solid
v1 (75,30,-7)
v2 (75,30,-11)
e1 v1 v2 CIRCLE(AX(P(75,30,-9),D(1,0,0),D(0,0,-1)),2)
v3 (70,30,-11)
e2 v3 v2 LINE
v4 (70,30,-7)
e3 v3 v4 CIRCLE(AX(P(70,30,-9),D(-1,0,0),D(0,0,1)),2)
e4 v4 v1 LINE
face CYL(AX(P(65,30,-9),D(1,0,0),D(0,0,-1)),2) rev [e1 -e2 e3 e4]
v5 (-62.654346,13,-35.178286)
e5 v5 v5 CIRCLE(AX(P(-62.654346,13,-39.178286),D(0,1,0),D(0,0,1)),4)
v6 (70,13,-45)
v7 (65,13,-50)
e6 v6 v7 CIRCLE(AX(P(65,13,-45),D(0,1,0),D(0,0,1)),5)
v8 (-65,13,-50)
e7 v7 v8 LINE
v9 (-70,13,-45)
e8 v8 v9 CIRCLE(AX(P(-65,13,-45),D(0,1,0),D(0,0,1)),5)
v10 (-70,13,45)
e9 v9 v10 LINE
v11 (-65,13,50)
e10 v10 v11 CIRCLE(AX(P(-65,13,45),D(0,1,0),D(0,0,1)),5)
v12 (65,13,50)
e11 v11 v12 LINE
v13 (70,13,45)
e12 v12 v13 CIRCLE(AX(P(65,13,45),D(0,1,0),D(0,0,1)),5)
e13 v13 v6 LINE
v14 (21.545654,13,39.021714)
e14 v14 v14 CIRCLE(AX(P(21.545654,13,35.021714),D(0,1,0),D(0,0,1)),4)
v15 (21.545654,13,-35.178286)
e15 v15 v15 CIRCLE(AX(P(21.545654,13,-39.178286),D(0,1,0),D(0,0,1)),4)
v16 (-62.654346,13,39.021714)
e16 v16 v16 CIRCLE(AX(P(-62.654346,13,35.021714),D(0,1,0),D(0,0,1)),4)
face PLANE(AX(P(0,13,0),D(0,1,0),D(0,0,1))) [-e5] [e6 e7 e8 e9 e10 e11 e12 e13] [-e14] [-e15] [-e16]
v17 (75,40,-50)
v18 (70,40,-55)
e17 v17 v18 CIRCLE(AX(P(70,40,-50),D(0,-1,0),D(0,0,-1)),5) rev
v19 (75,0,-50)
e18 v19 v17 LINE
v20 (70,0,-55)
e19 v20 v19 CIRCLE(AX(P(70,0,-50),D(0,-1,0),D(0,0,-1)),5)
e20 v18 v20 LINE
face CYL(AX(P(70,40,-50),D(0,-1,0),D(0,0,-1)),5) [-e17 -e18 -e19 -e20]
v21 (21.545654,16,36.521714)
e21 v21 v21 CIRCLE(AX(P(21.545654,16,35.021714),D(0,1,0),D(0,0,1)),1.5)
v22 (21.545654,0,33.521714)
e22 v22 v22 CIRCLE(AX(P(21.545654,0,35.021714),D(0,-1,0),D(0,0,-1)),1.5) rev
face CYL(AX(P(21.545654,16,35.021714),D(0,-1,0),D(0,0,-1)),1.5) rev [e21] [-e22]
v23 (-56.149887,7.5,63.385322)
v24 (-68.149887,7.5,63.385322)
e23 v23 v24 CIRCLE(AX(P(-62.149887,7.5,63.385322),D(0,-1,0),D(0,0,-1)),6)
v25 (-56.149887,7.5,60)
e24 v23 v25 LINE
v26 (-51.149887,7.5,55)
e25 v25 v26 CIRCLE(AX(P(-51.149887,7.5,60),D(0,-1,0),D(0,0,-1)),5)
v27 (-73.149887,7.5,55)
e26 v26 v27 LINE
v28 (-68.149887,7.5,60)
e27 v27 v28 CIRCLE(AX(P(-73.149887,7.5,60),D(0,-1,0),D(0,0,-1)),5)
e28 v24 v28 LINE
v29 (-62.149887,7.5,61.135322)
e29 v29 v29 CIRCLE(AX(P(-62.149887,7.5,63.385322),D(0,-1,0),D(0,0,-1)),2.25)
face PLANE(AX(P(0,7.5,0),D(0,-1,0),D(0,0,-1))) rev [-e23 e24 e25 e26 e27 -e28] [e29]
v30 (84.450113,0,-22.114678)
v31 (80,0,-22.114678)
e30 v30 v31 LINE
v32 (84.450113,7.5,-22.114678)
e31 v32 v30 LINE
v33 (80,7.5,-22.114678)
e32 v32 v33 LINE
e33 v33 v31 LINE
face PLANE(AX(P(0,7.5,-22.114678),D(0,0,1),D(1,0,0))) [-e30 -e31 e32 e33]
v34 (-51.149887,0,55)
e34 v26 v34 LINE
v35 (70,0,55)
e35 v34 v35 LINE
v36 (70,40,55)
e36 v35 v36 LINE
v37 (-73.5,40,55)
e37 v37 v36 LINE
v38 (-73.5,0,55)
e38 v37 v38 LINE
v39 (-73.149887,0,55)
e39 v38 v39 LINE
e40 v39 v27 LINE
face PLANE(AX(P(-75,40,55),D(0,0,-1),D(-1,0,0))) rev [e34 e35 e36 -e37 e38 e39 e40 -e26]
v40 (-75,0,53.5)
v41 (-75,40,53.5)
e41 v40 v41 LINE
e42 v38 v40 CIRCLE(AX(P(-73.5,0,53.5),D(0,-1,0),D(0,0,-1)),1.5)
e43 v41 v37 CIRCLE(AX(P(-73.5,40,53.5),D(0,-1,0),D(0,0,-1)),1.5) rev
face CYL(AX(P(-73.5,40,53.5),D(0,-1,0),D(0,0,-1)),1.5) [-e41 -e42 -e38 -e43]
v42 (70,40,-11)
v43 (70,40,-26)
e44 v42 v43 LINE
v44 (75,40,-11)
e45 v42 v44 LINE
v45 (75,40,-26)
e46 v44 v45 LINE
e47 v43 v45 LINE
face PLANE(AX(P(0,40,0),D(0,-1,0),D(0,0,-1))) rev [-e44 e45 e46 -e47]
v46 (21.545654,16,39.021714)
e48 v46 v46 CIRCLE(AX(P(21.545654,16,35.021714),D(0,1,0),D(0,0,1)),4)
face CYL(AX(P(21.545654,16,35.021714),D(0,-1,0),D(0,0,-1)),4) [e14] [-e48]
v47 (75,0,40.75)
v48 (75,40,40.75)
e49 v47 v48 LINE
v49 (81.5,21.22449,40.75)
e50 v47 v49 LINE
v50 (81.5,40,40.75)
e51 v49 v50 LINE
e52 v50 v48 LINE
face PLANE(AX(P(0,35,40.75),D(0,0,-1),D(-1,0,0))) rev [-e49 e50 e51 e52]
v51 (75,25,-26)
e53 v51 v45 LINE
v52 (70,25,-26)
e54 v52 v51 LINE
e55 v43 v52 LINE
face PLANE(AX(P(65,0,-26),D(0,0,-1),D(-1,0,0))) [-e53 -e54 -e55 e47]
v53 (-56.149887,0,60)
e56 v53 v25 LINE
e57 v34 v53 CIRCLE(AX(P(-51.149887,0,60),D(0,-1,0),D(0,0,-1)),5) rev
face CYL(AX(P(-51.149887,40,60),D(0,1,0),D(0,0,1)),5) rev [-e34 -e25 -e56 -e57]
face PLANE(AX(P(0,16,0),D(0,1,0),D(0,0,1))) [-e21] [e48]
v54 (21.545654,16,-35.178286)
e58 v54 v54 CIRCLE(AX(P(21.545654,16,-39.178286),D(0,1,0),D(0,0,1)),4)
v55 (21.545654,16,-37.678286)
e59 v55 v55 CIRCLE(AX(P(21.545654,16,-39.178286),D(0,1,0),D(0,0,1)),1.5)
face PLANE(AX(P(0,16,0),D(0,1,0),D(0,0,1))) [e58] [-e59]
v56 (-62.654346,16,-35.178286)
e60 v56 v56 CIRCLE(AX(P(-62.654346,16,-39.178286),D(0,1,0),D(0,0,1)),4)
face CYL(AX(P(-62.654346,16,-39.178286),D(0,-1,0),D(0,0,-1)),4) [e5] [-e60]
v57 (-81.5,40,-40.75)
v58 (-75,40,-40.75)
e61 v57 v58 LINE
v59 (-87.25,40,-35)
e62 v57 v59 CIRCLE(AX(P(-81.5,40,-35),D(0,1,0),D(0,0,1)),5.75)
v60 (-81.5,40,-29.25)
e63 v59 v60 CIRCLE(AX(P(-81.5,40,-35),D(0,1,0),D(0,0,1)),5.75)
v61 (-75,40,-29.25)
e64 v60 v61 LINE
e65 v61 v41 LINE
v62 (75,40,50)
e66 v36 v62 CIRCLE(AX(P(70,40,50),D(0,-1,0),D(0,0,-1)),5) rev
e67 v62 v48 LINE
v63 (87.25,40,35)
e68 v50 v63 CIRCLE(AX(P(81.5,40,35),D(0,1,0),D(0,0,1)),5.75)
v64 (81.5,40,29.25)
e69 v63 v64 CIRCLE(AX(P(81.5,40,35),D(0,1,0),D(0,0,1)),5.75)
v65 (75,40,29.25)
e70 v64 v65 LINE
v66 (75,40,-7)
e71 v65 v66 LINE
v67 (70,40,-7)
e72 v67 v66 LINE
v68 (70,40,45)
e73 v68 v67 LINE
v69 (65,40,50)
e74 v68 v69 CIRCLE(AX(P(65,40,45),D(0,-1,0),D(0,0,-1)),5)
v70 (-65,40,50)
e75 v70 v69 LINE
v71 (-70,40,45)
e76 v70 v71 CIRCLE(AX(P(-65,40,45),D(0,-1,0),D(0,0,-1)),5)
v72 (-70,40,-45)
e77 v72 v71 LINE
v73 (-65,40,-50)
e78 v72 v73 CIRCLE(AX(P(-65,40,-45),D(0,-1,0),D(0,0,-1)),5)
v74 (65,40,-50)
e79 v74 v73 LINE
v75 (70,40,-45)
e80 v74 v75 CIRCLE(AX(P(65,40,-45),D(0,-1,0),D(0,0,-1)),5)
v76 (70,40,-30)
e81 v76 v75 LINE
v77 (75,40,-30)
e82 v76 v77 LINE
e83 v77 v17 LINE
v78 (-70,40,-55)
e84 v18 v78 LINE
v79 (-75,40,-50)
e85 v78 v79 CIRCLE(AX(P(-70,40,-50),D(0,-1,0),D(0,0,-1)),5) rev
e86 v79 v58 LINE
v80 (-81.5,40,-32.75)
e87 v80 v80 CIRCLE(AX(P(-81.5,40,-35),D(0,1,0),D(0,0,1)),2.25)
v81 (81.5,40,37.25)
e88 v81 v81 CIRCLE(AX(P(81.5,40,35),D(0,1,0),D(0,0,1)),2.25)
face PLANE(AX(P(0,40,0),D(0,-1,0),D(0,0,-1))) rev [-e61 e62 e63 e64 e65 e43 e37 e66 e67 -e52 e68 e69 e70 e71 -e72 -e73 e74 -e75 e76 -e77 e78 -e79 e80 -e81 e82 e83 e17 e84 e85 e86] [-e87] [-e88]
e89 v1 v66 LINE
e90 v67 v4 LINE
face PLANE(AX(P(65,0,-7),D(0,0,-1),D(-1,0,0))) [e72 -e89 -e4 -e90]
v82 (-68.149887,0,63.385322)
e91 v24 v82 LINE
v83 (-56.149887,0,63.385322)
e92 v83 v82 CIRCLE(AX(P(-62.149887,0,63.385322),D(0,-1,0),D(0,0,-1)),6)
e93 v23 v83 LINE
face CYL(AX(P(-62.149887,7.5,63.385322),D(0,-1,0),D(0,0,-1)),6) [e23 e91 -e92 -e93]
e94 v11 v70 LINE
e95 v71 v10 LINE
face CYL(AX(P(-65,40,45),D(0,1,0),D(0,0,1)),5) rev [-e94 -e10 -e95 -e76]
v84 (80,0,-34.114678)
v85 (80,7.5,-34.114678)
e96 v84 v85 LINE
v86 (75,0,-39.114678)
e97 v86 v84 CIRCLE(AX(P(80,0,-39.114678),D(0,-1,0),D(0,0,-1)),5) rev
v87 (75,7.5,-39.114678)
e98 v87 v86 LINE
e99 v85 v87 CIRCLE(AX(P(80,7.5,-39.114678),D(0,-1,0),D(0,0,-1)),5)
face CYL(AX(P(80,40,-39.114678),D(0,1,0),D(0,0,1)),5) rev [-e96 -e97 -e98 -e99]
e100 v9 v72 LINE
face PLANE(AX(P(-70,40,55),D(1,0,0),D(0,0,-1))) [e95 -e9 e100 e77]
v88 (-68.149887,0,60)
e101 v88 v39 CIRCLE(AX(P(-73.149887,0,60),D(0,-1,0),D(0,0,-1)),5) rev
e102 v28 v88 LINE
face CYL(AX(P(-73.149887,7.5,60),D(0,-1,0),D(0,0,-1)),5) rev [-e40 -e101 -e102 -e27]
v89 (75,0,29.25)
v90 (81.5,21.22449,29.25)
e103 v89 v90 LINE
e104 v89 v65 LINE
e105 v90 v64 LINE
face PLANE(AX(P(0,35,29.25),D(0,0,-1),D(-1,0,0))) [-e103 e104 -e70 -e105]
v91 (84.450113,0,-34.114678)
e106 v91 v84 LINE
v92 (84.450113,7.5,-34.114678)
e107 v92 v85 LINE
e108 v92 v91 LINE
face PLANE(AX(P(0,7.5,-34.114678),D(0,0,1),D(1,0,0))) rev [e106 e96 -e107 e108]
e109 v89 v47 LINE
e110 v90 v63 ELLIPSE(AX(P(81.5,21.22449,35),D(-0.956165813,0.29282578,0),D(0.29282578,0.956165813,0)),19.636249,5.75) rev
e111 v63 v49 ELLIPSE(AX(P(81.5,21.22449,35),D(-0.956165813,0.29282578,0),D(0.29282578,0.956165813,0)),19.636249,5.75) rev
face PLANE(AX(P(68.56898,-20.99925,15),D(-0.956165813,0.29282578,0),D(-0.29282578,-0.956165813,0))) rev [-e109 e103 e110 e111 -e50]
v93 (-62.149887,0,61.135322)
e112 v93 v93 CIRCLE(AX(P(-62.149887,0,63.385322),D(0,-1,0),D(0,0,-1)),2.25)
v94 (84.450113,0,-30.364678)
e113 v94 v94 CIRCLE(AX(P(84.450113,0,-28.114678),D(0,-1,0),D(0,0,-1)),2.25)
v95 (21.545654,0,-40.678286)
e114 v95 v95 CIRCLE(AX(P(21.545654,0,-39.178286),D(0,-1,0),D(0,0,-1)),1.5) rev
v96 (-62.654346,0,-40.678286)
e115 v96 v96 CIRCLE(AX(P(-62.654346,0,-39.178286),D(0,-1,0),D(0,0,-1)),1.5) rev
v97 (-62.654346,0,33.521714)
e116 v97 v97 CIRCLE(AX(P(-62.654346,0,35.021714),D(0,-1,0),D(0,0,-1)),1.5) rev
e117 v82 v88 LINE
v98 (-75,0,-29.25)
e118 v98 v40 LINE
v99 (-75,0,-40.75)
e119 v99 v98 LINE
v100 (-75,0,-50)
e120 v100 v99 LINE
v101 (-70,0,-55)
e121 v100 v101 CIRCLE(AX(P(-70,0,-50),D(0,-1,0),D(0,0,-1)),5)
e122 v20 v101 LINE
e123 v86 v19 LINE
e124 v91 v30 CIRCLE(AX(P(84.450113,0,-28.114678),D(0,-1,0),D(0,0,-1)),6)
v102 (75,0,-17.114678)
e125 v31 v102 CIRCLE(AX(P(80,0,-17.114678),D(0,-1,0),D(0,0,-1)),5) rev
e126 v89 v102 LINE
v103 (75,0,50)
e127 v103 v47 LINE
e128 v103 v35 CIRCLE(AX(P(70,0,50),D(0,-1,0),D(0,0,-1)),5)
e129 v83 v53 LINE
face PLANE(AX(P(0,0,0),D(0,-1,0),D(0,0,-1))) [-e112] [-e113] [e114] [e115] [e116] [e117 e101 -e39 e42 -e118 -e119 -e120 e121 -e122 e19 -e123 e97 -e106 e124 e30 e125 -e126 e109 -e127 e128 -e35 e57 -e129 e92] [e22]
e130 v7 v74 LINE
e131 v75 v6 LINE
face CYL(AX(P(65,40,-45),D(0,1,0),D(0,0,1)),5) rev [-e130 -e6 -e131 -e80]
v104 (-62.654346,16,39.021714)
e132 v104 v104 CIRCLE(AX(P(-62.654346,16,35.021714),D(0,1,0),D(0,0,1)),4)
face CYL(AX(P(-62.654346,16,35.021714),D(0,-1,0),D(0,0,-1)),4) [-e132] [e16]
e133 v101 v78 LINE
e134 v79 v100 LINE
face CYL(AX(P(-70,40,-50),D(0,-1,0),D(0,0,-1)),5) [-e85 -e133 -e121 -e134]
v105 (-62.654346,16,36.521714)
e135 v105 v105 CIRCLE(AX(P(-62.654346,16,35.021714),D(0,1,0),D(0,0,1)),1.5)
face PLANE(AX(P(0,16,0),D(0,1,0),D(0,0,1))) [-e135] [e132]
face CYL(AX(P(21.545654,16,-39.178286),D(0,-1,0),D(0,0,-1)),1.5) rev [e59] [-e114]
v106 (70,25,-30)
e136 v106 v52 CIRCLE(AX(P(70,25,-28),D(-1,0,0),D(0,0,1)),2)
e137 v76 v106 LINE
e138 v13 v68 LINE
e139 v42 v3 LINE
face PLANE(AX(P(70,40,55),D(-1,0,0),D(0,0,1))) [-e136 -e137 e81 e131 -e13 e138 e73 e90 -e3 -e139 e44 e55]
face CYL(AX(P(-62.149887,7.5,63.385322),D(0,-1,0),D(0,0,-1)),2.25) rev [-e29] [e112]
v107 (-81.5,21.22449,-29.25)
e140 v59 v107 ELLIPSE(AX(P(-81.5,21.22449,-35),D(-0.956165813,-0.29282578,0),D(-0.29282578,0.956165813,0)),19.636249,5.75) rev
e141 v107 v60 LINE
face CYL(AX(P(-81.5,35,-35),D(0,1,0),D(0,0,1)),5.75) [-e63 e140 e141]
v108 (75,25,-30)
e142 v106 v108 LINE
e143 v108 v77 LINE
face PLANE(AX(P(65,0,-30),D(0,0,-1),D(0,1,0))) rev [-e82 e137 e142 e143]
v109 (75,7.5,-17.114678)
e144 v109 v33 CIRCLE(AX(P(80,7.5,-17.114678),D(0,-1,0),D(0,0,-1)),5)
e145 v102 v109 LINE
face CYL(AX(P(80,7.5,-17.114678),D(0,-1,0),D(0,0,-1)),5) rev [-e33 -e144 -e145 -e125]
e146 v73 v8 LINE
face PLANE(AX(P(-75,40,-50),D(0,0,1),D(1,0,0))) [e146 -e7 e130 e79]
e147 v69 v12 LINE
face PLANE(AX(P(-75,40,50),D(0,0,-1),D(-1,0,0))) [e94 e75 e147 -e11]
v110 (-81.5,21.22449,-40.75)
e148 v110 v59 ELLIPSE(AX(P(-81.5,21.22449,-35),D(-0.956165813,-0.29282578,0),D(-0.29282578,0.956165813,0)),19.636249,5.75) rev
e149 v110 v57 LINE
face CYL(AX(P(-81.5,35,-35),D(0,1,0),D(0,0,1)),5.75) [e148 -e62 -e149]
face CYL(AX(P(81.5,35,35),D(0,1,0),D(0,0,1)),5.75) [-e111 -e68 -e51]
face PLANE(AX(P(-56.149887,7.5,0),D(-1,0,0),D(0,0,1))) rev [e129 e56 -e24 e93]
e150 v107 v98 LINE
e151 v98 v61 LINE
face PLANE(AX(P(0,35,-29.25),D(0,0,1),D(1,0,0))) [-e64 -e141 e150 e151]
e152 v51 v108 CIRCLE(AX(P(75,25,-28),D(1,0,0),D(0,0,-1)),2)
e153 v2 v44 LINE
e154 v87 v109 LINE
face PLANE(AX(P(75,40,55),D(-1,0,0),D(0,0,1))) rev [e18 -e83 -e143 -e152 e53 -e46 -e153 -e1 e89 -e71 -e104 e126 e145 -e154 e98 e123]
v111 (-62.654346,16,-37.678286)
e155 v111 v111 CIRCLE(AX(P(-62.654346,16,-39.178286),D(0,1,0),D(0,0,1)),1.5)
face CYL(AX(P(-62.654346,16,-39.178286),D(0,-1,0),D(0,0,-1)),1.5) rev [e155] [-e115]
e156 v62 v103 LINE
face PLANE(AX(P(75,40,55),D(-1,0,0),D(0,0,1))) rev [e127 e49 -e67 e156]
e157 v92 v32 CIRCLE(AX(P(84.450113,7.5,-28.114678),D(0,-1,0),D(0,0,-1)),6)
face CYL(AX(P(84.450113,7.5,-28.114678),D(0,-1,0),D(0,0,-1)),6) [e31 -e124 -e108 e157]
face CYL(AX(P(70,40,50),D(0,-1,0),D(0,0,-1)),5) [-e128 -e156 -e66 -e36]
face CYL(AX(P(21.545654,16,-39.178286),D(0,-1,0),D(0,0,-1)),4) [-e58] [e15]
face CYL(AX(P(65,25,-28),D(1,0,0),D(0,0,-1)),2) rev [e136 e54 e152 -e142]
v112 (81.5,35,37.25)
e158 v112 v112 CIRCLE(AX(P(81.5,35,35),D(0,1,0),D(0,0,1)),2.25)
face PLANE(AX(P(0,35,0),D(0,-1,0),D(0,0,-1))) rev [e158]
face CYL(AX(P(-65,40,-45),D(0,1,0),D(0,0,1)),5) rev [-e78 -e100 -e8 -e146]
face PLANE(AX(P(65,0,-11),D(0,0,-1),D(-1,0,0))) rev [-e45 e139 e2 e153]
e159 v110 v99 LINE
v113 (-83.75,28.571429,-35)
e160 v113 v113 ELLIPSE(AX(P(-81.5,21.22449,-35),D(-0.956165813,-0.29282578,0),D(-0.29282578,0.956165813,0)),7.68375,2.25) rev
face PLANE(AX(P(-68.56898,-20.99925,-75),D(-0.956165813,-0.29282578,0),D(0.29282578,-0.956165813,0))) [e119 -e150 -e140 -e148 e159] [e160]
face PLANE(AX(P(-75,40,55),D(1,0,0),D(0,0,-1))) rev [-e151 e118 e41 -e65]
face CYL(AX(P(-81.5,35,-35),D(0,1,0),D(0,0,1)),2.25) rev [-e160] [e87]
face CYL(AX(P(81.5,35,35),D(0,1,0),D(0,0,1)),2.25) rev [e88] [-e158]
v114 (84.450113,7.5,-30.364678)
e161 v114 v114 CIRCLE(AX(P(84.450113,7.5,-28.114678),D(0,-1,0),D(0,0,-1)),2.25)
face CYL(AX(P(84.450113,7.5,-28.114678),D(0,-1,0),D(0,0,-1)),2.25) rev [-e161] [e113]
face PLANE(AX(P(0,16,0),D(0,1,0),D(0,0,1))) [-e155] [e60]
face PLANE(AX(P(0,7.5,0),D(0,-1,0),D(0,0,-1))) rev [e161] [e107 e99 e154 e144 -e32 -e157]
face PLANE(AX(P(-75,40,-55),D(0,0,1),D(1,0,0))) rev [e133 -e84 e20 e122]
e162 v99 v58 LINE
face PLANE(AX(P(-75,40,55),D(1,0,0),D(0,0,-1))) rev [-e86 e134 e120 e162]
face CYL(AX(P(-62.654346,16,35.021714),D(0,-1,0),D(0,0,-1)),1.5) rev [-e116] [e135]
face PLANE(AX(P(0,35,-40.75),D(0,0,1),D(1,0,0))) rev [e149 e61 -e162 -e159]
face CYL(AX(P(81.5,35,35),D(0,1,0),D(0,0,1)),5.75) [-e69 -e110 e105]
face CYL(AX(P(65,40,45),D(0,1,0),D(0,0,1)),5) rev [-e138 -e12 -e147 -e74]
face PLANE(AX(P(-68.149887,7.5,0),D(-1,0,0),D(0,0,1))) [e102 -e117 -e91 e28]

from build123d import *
from build123d.topology import SkipClean

# Parameters (mm, degrees)
SKETCH1_W           = 150
SKETCH1_H           = 110
BOSS_EXTRUDE1_DEPTH = 40
SHELL1_T            = -5
SKETCH2_R           = 6
SKETCH2_R_2         = 2.25
BOSS_EXTRUDE2_DEPTH = 7.5
SKETCH3_W           = 100
SKETCH3_H           = 100
BOSS_EXTRUDE3_DEPTH = 8
SKETCH4_W           = 99
SKETCH4_H           = 99
CUT_EXTRUDE1_DEPTH  = 8
SKETCH6_R           = 4
SKETCH6_R_2         = 1.5
BOSS_EXTRUDE4_DEPTH = 3
SKETCH7_R           = 1.5
CUT_EXTRUDE2_DEPTH  = 117.496977326
FILLET1_R           = 5
FILLET2_R           = 1.5
SKETCH8_R           = 2.25
BOSS_EXTRUDE5_DEPTH = 5
BOSS_EXTRUDE6_START = 8
BOSS_EXTRUDE6_DEPTH = 8
SKETCH10_R          = 2
CUT_EXTRUDE3_DEPTH  = 10
BOSS_EXTRUDE7_START = 8
SKETCH11_W          = 99
SKETCH11_H          = 99
SKETCH11_R          = 1.5
BOSS_EXTRUDE7_DEPTH = 8
SKETCH12_R          = 2.25
BOSS_EXTRUDE8_DEPTH = 35
CUT_EXTRUDE4_DEPTH  = 40
CUT_EXTRUDE5_DEPTH  = 130


with BuildPart() as part:
    # Sketch1 → Boss-Extrude1 (new body)
    with BuildSketch(Plane(origin=(0, 0, 0), x_dir=(1, 0, 0), z_dir=(0, 1, 0))):
        Rectangle(SKETCH1_W, SKETCH1_H)
    extrude(amount=BOSS_EXTRUDE1_DEPTH)

    # Shell1
    shell1_openings = [part.faces().sort_by_distance(p)[0] for p in [
        (0, 40, 0),
    ]]
    offset(amount=SHELL1_T, openings=shell1_openings, kind=Kind.INTERSECTION)

    # Sketch2 → Boss-Extrude2 (add)
    # profile 1 of 4: a face of its own
    with BuildSketch(Plane.XZ):
        with Locations((84.450112608, -28.114678388)):
            Circle(SKETCH2_R)
        with Locations(Location((84.450112608, -28.114678388, 0), (0, 0, 270))):
            Circle(SKETCH2_R_2, mode=Mode.SUBTRACT)
    # profile 2 of 4: a face of its own
    with BuildSketch(Plane.XZ):
        with BuildLine():
            ThreePointArc((84.450112608, -34.114678388), (78.450112608, -28.114678388), (84.450112608, -22.114678388))
            Line((84.450112608, -22.114678388), (75, -22.114678388))
            Line((75, -22.114678388), (75, -34.114678388))
            Line((75, -34.114678388), (84.450112608, -34.114678388))
        make_face()
    # profile 3 of 4: a face of its own
    with BuildSketch(Plane.XZ):
        with Locations((-62.149887392, 63.385321612)):
            Circle(SKETCH2_R)
        with Locations(Location((-62.149887392, 63.385321612, 0), (0, 0, 270))):
            Circle(SKETCH2_R_2, mode=Mode.SUBTRACT)
    # profile 4 of 4: a face of its own
    with BuildSketch(Plane.XZ):
        with BuildLine():
            Line((-68.149887392, 55), (-56.149887392, 55))
            Line((-56.149887392, 55), (-56.149887392, 63.385321612))
            ThreePointArc((-56.149887392, 63.385321612), (-62.149887392, 57.385321612), (-68.149887392, 63.385321612))
            Line((-68.149887392, 63.385321612), (-68.149887392, 55))
        make_face()
    extrude(amount=-BOSS_EXTRUDE2_DEPTH)

    # Sketch3 → Boss-Extrude3 (add)
    with BuildSketch(Plane(origin=(0, 5, 0), x_dir=(1, 0, 0), z_dir=(0, 1, 0))):
        with Locations((-20, 0)):
            Rectangle(SKETCH3_W, SKETCH3_H)
    extrude(amount=BOSS_EXTRUDE3_DEPTH)

    # Sketch4 → Cut-Extrude1 (cut)
    with BuildSketch(Plane.XZ):
        with Locations((-20, 0)):
            Rectangle(SKETCH4_W, SKETCH4_H)
    extrude(amount=-CUT_EXTRUDE1_DEPTH, mode=Mode.SUBTRACT)

    # Sketch6 → Boss-Extrude4 (add)
    # profile 1 of 4: a face of its own
    with BuildSketch(Plane(origin=(0, 13, 0), x_dir=(1, 0, 0), z_dir=(0, 1, 0))):
        with Locations(Location((21.54565415, 39.178286409, 0), (0, 0, 270))):
            Circle(SKETCH6_R)
        with Locations(Location((21.54565415, 39.178286409, 0), (0, 0, 270))):
            Circle(SKETCH6_R_2, mode=Mode.SUBTRACT)
    # profile 2 of 4: a face of its own
    with BuildSketch(Plane(origin=(0, 13, 0), x_dir=(1, 0, 0), z_dir=(0, 1, 0))):
        with Locations(Location((21.54565415, -35.021713591, 0), (0, 0, 270))):
            Circle(SKETCH6_R)
        with Locations(Location((21.54565415, -35.021713591, 0), (0, 0, 270))):
            Circle(SKETCH6_R_2, mode=Mode.SUBTRACT)
    # profile 3 of 4: a face of its own
    with BuildSketch(Plane(origin=(0, 13, 0), x_dir=(1, 0, 0), z_dir=(0, 1, 0))):
        with Locations(Location((-62.65434585, -35.021713591, 0), (0, 0, 270))):
            Circle(SKETCH6_R)
        with Locations(Location((-62.65434585, -35.021713591, 0), (0, 0, 270))):
            Circle(SKETCH6_R_2, mode=Mode.SUBTRACT)
    # profile 4 of 4: a face of its own
    with BuildSketch(Plane(origin=(0, 13, 0), x_dir=(1, 0, 0), z_dir=(0, 1, 0))):
        with Locations(Location((-62.65434585, 39.178286409, 0), (0, 0, 270))):
            Circle(SKETCH6_R)
        with Locations(Location((-62.65434585, 39.178286409, 0), (0, 0, 270))):
            Circle(SKETCH6_R_2, mode=Mode.SUBTRACT)
    extrude(amount=BOSS_EXTRUDE4_DEPTH)

    # Sketch7 → Cut-Extrude2 (cut, through all)
    with SkipClean():  # the faces are left unmerged after this step: merging them gives an invalid solid
        with BuildSketch(Plane(origin=(0, 16, 0), x_dir=(1, 0, 0), z_dir=(0, 1, 0))):
            with Locations(Location((-62.65434585, -35.021713591, 0), (0, 0, 90))):
                Circle(SKETCH7_R)
            with Locations(Location((-62.65434585, 39.178286409, 0), (0, 0, 90))):
                Circle(SKETCH7_R)
            with Locations(Location((21.54565415, -35.021713591, 0), (0, 0, 90))):
                Circle(SKETCH7_R)
            with Locations(Location((21.54565415, 39.178286409, 0), (0, 0, 90))):
                Circle(SKETCH7_R)
        extrude(amount=-CUT_EXTRUDE2_DEPTH, mode=Mode.SUBTRACT)
    add(part.part.scale(1), mode=Mode.REPLACE)  # the faces are merged on a copy

    # Fillet1
    fillet1_edges = [part.edges().sort_by_distance(p)[0] for p in [
        (70, 22.5, 50),
        (70, 22.5, -50),
        (-70, 26.5, -50),
        (-70, 26.5, 50),
        (75, 3.75, -34.114678388),
        (75, 3.75, -22.114678388),
        (-56.149887392, 3.75, 55),
        (-68.149887392, 3.75, 55),
        (75, 20, 55),
        (-75, 20, -55),
        (75, 20, -55),
    ]]
    fillet(fillet1_edges, radius=FILLET1_R)

    # Fillet2
    fillet2_edges = [part.edges().sort_by_distance(p)[0] for p in [
        (-75, 20, 55),
    ]]
    fillet(fillet2_edges, radius=FILLET2_R)

    # Sketch8 → Boss-Extrude5 (add)
    # profile 1 of 2: a face of its own
    with BuildSketch(Plane(origin=(0, 40, 0), x_dir=(1, 0, 0), z_dir=(0, 1, 0))):
        with BuildLine():
            Line((-75, 40.75), (-81.5, 40.75))
            ThreePointArc((-81.5, 40.75), (-87.25, 35), (-81.5, 29.25))
            Line((-81.5, 29.25), (-75, 29.25))
            Line((-75, 29.25), (-75, 40.75))
        make_face()
        with Locations(Location((-81.5, 35, 0), (0, 0, 270))):
            Circle(SKETCH8_R, mode=Mode.SUBTRACT)
    # profile 2 of 2: a face of its own
    with BuildSketch(Plane(origin=(0, 40, 0), x_dir=(1, 0, 0), z_dir=(0, 1, 0))):
        with BuildLine():
            Line((75, -40.75), (81.5, -40.75))
            ThreePointArc((81.5, -40.75), (87.25, -35), (81.5, -29.25))
            Line((81.5, -29.25), (75, -29.25))
            Line((75, -29.25), (75, -40.75))
        make_face()
        with Locations(Location((81.5, -35, 0), (0, 0, 270))):
            Circle(SKETCH8_R, mode=Mode.SUBTRACT)
    extrude(amount=-BOSS_EXTRUDE5_DEPTH)

    # Sketch9 → Boss-Extrude6 (add)
    with BuildSketch(Plane(origin=(0, 5, 0), x_dir=(1, 0, 0), z_dir=(0, 1, 0)).offset(BOSS_EXTRUDE6_START)):
        with BuildLine():
            Line((30, -50), (65, -50))
            ThreePointArc((65, -50), (68.535533906, -48.535533906), (70, -45))
            Line((70, -45), (70, 45))
            ThreePointArc((70, 45), (68.535533906, 48.535533906), (65, 50))
            Line((65, 50), (30, 50))
            Line((30, 50), (30, -50))
        make_face()
    extrude(amount=-BOSS_EXTRUDE6_DEPTH)

    # Sketch10 → Cut-Extrude3 (cut)
    with BuildSketch(Plane(origin=(75, 0, 0), x_dir=(0, 0, -1), z_dir=(1, 0, 0))):
        with BuildLine():
            Line((7, 40), (7, 30))
            ThreePointArc((7, 30), (9, 32), (11, 30))
            Line((11, 30), (11, 40))
            Line((11, 40), (7, 40))
        make_face()
        with Locations((9, 30)):
            Circle(SKETCH10_R)
        with BuildLine():
            Line((30, 40), (26, 40))
            Line((26, 40), (26, 25))
            ThreePointArc((26, 25), (28, 27), (30, 25))
            Line((30, 25), (30, 40))
        make_face()
        with Locations((28, 25)):
            Circle(SKETCH10_R)
    extrude(amount=-CUT_EXTRUDE3_DEPTH, mode=Mode.SUBTRACT)

    # Sketch11 → Boss-Extrude7 (add)
    with BuildSketch(Plane.XZ.offset(-8).offset(BOSS_EXTRUDE7_START)):
        with Locations((-20, 0)):
            Rectangle(SKETCH11_W, SKETCH11_H)
        with Locations(Location((21.54565415, 35.021713591, 0), (0, 0, 270))):
            Circle(SKETCH11_R, mode=Mode.SUBTRACT)
        with Locations(Location((-62.65434585, 35.021713591, 0), (0, 0, 270))):
            Circle(SKETCH11_R, mode=Mode.SUBTRACT)
        with Locations(Location((21.54565415, -39.178286409, 0), (0, 0, 270))):
            Circle(SKETCH11_R, mode=Mode.SUBTRACT)
        with Locations(Location((-62.65434585, -39.178286409, 0), (0, 0, 270))):
            Circle(SKETCH11_R, mode=Mode.SUBTRACT)
    extrude(amount=-BOSS_EXTRUDE7_DEPTH)

    # Sketch12 → Boss-Extrude8 (add)
    # profile 1 of 2: a face of its own
    with SkipClean():  # the faces are left unmerged after this step: merging them gives an invalid solid
        with BuildSketch(Plane.XZ.offset(-35)):
            with BuildLine():
                ThreePointArc((-81.5, -29.25), (-87.25, -35), (-81.5, -40.75))
                Line((-81.5, -40.75), (-75, -40.75))
                Line((-75, -40.75), (-75, -29.25))
                Line((-75, -29.25), (-81.5, -29.25))
            make_face()
            with Locations((-81.5, -35)):
                Circle(SKETCH12_R, mode=Mode.SUBTRACT)
        # profile 2 of 2: a face of its own
        with BuildSketch(Plane.XZ.offset(-35)):
            with BuildLine():
                ThreePointArc((81.5, 29.25), (87.25, 35), (81.5, 40.75))
                Line((81.5, 40.75), (75, 40.75))
                Line((75, 40.75), (75, 29.25))
                Line((75, 29.25), (81.5, 29.25))
            make_face()
        extrude(amount=BOSS_EXTRUDE8_DEPTH)
    add(part.part.scale(1), mode=Mode.REPLACE)  # the faces are merged on a copy

    # Sketch13 → Cut-Extrude4 (cut)
    with BuildSketch(Plane.XY.offset(55)):
        Polygon((87.25, 0), (87.25, 40), (81.5, 21.224489796), (81.5, 0), align=None)
        Polygon((81.5, 0), (81.5, 21.224489796), (75, 0), align=None)
        Polygon((-75, 0), (-81.5, 21.224489796), (-81.5, 0), align=None)
        Polygon((-81.5, 21.224489796), (-87.25, 40), (-87.25, 0), (-81.5, 0), align=None)
    extrude(amount=-CUT_EXTRUDE4_DEPTH, mode=Mode.SUBTRACT)

    # Sketch14 → Cut-Extrude5 (cut)
    with BuildSketch(Plane.XY.offset(55)):
        Polygon((-81.5, 21.224489796), (-81.5, 0), (-75, 0), align=None)
        Polygon((-87.25, 0), (-81.5, 0), (-81.5, 21.224489796), (-87.25, 40), align=None)
    extrude(amount=-CUT_EXTRUDE5_DEPTH, mode=Mode.SUBTRACT)


solid = part.part
